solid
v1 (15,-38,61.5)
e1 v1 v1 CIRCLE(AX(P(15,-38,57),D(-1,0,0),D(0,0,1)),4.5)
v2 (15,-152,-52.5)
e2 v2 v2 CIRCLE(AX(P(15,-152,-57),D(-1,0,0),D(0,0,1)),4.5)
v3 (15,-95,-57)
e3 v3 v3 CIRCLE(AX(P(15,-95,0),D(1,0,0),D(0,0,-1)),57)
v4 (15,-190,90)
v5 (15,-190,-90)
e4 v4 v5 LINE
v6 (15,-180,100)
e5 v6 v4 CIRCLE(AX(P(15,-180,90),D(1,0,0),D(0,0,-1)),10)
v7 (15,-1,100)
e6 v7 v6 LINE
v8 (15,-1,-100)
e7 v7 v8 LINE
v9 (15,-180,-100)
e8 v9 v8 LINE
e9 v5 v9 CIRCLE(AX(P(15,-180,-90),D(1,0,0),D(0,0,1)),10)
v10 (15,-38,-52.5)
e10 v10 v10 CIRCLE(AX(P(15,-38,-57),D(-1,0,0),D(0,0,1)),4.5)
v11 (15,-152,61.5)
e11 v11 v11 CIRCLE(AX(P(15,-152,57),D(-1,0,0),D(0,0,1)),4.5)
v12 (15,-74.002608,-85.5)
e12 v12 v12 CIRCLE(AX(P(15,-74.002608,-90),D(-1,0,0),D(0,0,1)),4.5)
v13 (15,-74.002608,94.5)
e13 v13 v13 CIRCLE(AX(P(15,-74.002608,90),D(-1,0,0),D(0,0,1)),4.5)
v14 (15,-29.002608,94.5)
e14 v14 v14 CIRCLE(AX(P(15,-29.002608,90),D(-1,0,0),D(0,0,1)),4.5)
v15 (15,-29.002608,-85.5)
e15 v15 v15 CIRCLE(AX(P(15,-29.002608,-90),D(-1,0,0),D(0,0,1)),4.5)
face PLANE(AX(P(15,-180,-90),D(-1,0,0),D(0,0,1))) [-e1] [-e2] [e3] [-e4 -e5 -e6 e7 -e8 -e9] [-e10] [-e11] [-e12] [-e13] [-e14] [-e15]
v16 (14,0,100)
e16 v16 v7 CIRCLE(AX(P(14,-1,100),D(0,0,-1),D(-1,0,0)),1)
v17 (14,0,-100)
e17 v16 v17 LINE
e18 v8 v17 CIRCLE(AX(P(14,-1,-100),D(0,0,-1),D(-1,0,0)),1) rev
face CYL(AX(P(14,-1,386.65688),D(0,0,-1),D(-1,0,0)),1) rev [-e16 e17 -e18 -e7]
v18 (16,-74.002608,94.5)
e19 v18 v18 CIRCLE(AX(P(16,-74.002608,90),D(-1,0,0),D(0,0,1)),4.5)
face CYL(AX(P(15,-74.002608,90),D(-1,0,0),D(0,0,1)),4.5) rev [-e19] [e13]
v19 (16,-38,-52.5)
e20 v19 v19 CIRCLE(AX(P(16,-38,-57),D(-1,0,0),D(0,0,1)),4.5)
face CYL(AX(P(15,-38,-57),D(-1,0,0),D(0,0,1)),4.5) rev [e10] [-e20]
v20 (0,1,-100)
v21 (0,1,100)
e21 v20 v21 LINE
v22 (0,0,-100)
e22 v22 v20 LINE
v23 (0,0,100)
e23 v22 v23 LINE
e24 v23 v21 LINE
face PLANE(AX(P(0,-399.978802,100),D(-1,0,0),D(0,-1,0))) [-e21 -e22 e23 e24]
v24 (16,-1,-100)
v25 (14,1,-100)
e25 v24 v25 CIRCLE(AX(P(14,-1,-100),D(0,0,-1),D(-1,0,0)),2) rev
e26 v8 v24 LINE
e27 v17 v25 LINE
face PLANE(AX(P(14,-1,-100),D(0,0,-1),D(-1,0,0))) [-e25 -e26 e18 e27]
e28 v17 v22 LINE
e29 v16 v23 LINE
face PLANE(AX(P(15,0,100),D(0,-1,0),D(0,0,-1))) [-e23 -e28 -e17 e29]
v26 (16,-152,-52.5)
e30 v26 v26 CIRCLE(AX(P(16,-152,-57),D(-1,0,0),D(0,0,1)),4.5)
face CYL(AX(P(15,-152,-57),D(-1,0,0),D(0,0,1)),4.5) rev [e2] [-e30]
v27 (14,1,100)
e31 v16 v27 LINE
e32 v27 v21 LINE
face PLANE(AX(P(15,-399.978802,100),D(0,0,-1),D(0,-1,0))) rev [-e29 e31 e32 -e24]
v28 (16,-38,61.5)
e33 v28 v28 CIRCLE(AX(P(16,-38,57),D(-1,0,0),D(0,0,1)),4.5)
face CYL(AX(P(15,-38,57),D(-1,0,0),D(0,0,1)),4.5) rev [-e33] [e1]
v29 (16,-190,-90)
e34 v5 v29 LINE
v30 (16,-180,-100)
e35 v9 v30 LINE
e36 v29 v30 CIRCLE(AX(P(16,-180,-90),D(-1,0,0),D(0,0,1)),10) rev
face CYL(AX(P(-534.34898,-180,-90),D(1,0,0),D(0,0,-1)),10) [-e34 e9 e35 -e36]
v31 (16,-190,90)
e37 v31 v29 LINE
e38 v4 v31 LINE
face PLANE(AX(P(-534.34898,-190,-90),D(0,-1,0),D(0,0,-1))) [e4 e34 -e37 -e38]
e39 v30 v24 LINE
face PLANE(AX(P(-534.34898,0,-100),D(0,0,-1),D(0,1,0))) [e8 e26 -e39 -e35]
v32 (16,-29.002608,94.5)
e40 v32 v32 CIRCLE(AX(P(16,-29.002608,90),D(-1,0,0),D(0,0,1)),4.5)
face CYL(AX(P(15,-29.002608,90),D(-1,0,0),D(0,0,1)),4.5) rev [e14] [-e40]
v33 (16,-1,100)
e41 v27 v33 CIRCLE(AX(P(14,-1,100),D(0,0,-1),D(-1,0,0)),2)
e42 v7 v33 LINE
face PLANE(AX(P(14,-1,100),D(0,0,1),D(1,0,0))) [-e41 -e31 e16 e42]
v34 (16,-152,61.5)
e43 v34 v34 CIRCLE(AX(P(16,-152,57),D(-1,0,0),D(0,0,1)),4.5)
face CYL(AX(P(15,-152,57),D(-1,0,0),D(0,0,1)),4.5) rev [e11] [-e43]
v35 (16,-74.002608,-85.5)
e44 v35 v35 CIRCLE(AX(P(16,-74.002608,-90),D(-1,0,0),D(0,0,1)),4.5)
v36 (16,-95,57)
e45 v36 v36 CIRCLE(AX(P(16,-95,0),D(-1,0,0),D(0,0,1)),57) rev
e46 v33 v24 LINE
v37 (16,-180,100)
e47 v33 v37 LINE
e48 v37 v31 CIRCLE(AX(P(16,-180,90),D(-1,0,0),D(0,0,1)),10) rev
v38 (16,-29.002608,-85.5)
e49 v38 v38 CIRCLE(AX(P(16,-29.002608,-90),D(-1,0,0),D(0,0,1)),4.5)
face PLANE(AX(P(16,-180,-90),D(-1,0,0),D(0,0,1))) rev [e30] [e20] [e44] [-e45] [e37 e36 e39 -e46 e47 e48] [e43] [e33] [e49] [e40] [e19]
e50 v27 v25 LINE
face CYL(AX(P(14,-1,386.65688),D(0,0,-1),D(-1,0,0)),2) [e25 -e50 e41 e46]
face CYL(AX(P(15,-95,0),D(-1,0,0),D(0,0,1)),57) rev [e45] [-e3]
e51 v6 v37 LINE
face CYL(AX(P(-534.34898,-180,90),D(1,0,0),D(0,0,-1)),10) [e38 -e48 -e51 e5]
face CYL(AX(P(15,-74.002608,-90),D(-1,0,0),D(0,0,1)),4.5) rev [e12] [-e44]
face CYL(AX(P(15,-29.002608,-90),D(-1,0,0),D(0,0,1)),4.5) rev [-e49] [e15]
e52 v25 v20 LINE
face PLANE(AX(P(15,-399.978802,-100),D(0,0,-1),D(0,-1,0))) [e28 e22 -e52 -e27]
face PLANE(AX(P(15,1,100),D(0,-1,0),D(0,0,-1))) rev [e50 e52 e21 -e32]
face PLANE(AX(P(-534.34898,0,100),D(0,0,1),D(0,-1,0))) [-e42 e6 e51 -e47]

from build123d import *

# Parameters (mm, degrees)
CROQUIS1_R                       = 57
SALIENTE_EXTRUIR1_DEPTH          = 15
VACIADO1_T                       = 1
DESPLEGAR_PLIEGUES1_OUTLINE_W    = 1
DESPLEGAR_PLIEGUES1_OUTLINE_H    = 200
DESPLEGAR_PLIEGUES1_DEPTH        = 15
DESPLEGAR_START                  = 15
DESPLEGAR_PLIEGUES1_2_OUTLINE_W  = 14.35619449
DESPLEGAR_PLIEGUES1_2_OUTLINE_H  = 200
DESPLEGAR_PLIEGUES1_2_DEPTH      = 1
PROCESAR_START                   = -100
PROCESAR_PLIEGUES1_DEPTH         = 200
PROCESAR_PLIEGUES1_2_DEPTH       = 200
TALADRO_DE_MARGEN_PARA_M83_D     = 9
TALADRO_DE_MARGEN_PARA_M84_D     = 9
TALADRO_DE_MARGEN_PARA_M84_DEPTH = 15.42
TALADRO_DE_MARGEN_PARA_M85_D     = 9
TALADRO_DE_MARGEN_PARA_M85_DEPTH = 1.999


# Read off the part's stored shape, not the designer's step: Desplegar pliegues1, Procesar pliegues1
with BuildPart() as part:
    # Croquis1 → Saliente-Extruir1 (new body)
    with BuildSketch(Plane(origin=(0, 0, 0), x_dir=(0, 0, -1), z_dir=(1, 0, 0))):
        with BuildLine():
            Line((-100, 0), (100, 0))
            Line((100, 0), (100, -180))
            ThreePointArc((100, -180), (97.071067812, -187.071067812), (90, -190))
            Line((90, -190), (-90, -190))
            ThreePointArc((-90, -190), (-97.071067812, -187.071067812), (-100, -180))
            Line((-100, -180), (-100, 0))
        make_face()
        with Locations((0, -95)):
            Circle(CROQUIS1_R, mode=Mode.SUBTRACT)
    extrude(amount=SALIENTE_EXTRUIR1_DEPTH)

    # Vaciado1
    vaciado1_openings = [part.faces().sort_by_distance(p)[0] for p in [
        (7.5, -90, -100),
        (7.5, -187.071067812, -97.071067812),
        (7.5, -190, 0),
        (7.5, -187.071067812, 97.071067812),
        (7.5, -90, 100),
        (7.5, -95, 57),
        (0, -2.758622845, 0),
    ]]
    offset(amount=VACIADO1_T, openings=vaciado1_openings, kind=Kind.INTERSECTION)

    # Desplegar pliegues1 outline → Desplegar pliegues1 (cut)
    with BuildSketch(Plane.YZ):
        with Locations((0.5, 0)):
            Rectangle(DESPLEGAR_PLIEGUES1_OUTLINE_W, DESPLEGAR_PLIEGUES1_OUTLINE_H)
    extrude(amount=DESPLEGAR_PLIEGUES1_DEPTH, mode=Mode.SUBTRACT)

    # Desplegar pliegues1 2 outline → Desplegar pliegues1 2 (add)
    with BuildSketch(Plane.YZ.offset(DESPLEGAR_START)):
        with Locations((8.178097245, 0)):
            Rectangle(DESPLEGAR_PLIEGUES1_2_OUTLINE_W, DESPLEGAR_PLIEGUES1_2_OUTLINE_H)
    extrude(amount=DESPLEGAR_PLIEGUES1_2_DEPTH)

    # Procesar pliegues1 outline → Procesar pliegues1 (cut)
    with BuildSketch(Plane.XY.offset(PROCESAR_START)):
        with BuildLine():
            Line((15, 15.35619449), (15, 0.732050807))
            ThreePointArc((15, 0.732050807), (15.732050807, 0), (16, -1))
            Line((16, -1), (16, 15.35619449))
            Line((16, 15.35619449), (15, 15.35619449))
        make_face()
    extrude(amount=PROCESAR_PLIEGUES1_DEPTH, mode=Mode.SUBTRACT)

    # Procesar pliegues1 2 outline → Procesar pliegues1 2 (add)
    with BuildSketch(Plane.XY.offset(PROCESAR_START)):
        with BuildLine():
            Line((14, 1), (0, 1))
            Line((0, 1), (0, 0))
            Line((0, 0), (14, 0))
            ThreePointArc((14, 0), (14.707106781, -0.292893219), (15, -1))
            Line((15, -1), (15, 0.732050807))
            ThreePointArc((15, 0.732050807), (14.51763809, 0.931851652), (14, 1))
        make_face()
    extrude(amount=PROCESAR_PLIEGUES1_2_DEPTH)

    # Taladro de margen para M83 (through all)
    with Locations(Plane(origin=(15, -102.41730184, -252.760845032), x_dir=(0, 0, 1), z_dir=(-1, 0, 0))):
        with Locations((162.760845032, 73.414694032), (162.760845032, 28.414694032), (342.760845032, 73.414694032), (342.760845032, 28.414694032)):
            Hole(TALADRO_DE_MARGEN_PARA_M83_D / 2)

    # Taladro de margen para M84
    with Locations(Plane(origin=(15, -102.41730184, -252.760845032), x_dir=(0, 0, 1), z_dir=(-1, 0, 0))):
        with Locations((195.760845032, 64.41730184), (309.760845032, 64.41730184)):
            Hole(TALADRO_DE_MARGEN_PARA_M84_D / 2, depth=TALADRO_DE_MARGEN_PARA_M84_DEPTH)

    # Taladro de margen para M85
    with Locations(Plane(origin=(15, -102.41730184, -252.760845032), x_dir=(0, 0, 1), z_dir=(-1, 0, 0))):
        with Locations((309.760845032, -49.58269816), (195.760845032, -49.58269816)):
            Hole(TALADRO_DE_MARGEN_PARA_M85_D / 2, depth=TALADRO_DE_MARGEN_PARA_M85_DEPTH)


solid = part.part
